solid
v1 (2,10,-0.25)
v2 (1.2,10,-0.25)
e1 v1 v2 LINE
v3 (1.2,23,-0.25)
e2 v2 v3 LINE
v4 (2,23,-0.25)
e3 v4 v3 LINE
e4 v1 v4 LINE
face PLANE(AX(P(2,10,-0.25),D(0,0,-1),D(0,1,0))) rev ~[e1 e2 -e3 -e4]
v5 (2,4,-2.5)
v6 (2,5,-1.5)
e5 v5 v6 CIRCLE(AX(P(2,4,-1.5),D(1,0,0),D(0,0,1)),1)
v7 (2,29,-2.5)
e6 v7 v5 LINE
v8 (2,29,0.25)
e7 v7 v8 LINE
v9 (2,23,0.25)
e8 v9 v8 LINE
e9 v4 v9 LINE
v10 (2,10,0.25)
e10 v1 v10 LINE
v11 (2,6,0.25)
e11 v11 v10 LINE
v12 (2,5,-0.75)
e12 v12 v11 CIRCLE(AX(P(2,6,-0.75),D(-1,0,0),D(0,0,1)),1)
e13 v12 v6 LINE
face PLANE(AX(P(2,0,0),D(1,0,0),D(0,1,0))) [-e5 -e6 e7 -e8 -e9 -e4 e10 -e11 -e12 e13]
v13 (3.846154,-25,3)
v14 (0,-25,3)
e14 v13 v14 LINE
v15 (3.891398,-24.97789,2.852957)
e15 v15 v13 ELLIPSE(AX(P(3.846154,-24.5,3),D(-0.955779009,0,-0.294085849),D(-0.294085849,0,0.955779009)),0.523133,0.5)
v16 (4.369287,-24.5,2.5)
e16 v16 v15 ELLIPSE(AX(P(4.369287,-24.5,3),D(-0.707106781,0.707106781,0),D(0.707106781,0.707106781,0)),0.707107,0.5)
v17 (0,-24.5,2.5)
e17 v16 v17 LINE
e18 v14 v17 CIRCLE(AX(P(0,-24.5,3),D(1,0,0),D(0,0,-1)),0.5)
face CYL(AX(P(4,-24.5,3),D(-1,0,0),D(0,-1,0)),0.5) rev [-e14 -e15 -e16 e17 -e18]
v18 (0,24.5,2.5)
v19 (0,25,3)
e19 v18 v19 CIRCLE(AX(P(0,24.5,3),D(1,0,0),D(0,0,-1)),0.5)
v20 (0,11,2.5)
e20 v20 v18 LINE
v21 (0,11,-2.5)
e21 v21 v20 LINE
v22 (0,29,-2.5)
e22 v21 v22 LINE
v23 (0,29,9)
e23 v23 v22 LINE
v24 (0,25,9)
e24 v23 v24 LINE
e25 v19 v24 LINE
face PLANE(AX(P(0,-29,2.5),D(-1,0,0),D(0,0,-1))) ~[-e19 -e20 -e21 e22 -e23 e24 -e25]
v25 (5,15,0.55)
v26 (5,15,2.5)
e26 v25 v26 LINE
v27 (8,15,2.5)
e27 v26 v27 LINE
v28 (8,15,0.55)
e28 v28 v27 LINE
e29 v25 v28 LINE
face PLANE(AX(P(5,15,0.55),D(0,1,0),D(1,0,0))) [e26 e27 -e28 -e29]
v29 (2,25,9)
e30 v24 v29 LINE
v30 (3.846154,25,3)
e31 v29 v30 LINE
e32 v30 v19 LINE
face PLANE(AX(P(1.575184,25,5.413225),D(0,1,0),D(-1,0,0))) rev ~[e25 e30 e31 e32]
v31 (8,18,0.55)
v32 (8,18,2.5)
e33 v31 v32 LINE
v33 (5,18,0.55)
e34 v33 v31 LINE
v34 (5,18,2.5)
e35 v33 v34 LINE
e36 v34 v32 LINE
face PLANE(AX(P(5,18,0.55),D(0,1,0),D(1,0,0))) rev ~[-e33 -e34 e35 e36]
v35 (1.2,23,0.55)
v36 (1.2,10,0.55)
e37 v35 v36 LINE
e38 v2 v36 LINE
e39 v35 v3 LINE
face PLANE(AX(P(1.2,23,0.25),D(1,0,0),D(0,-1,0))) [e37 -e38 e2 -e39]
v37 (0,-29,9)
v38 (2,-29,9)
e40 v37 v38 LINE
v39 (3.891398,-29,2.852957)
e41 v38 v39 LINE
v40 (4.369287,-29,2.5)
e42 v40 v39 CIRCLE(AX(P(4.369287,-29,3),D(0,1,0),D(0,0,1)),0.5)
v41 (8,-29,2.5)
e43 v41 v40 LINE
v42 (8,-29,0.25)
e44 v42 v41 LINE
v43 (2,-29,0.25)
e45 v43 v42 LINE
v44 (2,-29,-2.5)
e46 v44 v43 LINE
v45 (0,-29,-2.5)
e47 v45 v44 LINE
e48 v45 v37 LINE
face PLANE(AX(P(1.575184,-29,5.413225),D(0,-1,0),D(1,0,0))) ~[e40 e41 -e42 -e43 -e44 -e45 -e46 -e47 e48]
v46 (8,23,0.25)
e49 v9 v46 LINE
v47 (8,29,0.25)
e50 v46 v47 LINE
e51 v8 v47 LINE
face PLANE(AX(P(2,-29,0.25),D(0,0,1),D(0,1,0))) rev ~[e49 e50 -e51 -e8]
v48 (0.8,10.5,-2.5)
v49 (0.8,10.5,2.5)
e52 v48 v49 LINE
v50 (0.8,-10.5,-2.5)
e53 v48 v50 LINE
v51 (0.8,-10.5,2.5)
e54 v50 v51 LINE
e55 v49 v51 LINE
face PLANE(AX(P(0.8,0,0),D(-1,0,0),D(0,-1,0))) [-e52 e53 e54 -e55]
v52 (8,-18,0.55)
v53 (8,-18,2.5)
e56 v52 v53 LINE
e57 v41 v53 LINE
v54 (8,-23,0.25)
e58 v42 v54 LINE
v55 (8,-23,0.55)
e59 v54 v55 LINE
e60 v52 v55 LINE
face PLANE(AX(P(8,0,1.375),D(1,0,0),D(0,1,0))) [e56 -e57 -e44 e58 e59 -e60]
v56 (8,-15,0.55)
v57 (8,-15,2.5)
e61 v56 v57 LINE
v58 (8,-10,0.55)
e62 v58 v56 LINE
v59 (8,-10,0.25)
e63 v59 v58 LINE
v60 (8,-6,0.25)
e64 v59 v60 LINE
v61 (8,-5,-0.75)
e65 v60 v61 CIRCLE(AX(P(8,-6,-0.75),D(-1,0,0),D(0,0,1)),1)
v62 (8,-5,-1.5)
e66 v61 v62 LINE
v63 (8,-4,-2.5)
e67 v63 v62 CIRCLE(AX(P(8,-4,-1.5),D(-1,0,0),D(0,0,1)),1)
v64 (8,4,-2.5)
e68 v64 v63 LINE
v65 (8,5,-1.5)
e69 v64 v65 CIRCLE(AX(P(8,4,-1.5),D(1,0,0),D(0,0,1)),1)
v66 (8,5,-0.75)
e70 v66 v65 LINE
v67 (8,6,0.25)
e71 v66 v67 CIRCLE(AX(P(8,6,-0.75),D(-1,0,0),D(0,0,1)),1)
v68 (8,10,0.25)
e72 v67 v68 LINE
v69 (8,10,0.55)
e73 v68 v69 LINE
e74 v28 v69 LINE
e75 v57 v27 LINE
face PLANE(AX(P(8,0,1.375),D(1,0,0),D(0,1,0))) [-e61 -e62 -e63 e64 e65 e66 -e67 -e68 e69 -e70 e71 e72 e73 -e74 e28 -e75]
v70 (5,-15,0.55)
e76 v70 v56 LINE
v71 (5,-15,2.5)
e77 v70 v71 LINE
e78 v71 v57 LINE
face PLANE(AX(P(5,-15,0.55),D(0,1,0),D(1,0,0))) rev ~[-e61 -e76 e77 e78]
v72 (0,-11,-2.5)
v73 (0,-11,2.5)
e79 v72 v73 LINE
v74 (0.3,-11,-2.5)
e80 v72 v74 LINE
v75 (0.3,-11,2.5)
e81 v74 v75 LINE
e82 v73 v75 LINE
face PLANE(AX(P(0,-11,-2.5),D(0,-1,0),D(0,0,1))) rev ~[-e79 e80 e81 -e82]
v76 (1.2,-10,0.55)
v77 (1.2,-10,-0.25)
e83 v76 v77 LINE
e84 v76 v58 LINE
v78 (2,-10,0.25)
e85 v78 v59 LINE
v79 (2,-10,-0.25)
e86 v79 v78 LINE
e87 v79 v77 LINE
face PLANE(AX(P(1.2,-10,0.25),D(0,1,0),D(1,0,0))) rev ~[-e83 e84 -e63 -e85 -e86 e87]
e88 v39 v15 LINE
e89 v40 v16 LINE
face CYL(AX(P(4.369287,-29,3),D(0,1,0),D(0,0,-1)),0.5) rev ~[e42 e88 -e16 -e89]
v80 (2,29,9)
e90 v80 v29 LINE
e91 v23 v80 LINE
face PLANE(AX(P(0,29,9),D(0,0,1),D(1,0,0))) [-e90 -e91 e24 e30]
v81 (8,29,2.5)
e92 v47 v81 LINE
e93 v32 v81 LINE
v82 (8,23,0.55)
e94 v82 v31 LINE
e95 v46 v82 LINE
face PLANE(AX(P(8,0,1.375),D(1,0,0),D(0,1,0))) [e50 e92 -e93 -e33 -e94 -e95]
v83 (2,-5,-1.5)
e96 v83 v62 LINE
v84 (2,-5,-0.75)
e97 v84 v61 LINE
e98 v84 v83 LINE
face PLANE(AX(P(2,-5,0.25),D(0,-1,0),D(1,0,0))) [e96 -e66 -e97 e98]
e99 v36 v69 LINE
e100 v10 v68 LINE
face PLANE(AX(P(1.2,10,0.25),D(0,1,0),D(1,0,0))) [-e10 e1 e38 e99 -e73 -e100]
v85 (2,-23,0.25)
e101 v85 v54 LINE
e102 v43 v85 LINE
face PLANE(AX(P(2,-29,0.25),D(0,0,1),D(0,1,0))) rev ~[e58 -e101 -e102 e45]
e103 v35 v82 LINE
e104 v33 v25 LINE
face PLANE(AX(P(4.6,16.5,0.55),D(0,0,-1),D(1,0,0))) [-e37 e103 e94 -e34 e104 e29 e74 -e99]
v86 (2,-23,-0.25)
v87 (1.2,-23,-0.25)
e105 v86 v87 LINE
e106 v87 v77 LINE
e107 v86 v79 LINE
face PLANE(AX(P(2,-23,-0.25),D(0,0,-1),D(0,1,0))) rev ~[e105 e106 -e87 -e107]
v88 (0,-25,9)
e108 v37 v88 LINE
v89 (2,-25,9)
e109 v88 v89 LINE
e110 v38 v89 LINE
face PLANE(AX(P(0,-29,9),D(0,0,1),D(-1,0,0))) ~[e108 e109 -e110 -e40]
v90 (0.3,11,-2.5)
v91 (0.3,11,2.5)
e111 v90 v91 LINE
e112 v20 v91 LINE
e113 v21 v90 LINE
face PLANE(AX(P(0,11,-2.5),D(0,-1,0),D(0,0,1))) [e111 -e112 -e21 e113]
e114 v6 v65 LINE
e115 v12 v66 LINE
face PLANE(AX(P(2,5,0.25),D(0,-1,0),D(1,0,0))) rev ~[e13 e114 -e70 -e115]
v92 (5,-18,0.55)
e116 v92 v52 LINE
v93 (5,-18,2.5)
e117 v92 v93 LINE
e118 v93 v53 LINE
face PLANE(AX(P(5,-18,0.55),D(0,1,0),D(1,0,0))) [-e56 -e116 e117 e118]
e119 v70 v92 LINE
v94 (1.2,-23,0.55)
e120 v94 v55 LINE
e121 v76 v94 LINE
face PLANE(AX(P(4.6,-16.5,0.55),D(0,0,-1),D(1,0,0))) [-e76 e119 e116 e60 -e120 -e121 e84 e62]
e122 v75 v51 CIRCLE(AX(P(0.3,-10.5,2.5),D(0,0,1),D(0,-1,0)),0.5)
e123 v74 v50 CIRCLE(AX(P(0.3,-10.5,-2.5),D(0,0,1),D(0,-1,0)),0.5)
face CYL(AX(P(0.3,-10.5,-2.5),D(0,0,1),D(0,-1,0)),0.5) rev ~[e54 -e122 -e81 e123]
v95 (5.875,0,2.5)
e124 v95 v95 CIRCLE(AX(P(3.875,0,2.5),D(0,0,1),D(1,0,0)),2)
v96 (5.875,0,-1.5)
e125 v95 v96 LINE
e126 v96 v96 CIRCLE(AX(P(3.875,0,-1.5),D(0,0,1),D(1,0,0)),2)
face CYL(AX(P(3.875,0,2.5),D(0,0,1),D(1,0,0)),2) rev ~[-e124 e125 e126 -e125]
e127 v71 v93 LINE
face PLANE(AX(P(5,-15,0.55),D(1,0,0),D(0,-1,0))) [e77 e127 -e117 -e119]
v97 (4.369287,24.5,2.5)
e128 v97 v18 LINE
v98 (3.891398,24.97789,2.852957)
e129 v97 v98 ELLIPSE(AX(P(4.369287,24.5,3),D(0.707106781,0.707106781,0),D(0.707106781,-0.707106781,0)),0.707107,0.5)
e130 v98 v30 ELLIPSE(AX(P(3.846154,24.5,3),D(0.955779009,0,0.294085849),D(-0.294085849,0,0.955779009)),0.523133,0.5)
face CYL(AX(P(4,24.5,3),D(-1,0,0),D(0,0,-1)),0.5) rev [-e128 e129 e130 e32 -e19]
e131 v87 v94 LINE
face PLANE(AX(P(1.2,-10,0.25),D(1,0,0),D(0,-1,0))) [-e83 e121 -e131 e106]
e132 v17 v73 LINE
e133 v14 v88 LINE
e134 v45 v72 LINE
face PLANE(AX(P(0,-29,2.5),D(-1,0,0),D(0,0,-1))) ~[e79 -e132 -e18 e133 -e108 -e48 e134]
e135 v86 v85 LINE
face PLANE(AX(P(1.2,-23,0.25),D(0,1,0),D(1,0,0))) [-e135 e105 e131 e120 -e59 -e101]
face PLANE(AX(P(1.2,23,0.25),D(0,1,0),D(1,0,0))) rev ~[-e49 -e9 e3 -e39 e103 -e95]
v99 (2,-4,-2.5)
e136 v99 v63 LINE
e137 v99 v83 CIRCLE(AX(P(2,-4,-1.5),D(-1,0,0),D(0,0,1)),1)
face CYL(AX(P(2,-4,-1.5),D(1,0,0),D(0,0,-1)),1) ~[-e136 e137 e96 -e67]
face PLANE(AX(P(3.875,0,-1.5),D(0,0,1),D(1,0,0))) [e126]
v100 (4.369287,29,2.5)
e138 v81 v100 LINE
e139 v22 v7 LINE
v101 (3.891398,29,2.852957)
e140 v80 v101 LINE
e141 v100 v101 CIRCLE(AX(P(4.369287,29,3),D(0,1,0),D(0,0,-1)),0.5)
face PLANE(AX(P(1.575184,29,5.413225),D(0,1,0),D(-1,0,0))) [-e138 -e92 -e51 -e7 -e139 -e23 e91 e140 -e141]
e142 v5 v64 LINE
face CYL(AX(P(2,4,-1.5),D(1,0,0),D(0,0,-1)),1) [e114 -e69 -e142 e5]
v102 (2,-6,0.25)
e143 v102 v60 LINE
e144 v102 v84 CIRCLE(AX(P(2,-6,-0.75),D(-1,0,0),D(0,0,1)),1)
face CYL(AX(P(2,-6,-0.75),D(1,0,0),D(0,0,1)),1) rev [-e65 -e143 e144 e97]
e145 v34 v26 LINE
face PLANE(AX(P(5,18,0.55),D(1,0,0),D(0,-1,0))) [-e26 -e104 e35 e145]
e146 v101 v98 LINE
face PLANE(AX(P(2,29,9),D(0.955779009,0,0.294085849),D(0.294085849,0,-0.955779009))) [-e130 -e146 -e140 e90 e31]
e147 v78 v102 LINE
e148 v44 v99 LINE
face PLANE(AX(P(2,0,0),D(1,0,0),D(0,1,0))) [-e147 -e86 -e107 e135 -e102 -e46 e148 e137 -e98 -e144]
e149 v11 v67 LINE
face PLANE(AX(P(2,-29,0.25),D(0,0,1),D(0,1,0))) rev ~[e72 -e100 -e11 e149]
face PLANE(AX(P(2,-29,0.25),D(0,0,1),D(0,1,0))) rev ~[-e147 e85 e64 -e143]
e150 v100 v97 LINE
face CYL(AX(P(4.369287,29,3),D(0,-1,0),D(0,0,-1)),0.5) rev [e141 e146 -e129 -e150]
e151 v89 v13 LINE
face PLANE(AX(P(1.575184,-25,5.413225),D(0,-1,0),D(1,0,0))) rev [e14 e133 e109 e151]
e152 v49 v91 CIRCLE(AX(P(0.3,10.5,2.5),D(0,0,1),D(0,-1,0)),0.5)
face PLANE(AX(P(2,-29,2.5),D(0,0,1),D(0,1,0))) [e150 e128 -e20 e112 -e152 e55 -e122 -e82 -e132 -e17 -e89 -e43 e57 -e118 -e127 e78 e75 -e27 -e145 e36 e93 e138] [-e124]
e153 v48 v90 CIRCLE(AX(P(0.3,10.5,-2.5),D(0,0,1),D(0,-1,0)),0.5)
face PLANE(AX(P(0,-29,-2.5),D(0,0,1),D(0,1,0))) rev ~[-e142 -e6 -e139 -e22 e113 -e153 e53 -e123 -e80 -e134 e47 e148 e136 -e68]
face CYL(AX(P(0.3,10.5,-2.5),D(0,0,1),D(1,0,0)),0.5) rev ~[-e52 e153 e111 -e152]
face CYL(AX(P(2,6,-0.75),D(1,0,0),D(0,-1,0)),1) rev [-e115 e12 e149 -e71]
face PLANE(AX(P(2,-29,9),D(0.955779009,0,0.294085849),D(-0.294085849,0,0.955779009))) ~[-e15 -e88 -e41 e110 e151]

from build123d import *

# Parameters (mm, degrees)
F0_W      = 58
F0_H      = 5
F1_DEPTH  = 2
F2_W      = 13
F2_H      = 0.5
F3_DEPTH  = 0.8
F4_W      = 58
F4_H      = 2.25
F5_DEPTH  = 6
F6_W      = 6
F6_H      = 10
F7_DEPTH  = 2.75
F8_R      = 2
F9_DEPTH  = 4
F10_R     = 1
F12_DEPTH = 4
F13_W     = 22
F13_H     = 5
F14_DEPTH = 0.8
F15_R     = 0.5
F16_W     = 6.8
F16_H     = 13
F17_DEPTH = 0.3
F18_W     = 3
F18_H     = 3
F19_DEPTH = 1.95


# Not quite as in the source:
# - a pattern or mirror of a feature is missing from the dataset's text; its kind, count and spacing are read off the source's solid


with BuildPart() as f1:
    # F0 (on Right) → F1 (new body)
    with BuildSketch(Plane.YZ):
        Rectangle(F0_W, F0_H)
    extrude(amount=F1_DEPTH)

    # F2 (on face) → F3 (cut)
    with BuildSketch(Plane.YZ.offset(2)):
        with Locations((16.5, 0)):
            Rectangle(F2_W, F2_H)
        with Locations((-16.5, 0)):
            Rectangle(F2_W, F2_H)
    extrude(amount=-F3_DEPTH, mode=Mode.SUBTRACT)

    # F4 (on face) → F5 (join)
    with BuildSketch(Plane.YZ.offset(2)):
        with Locations((0, 1.375)):
            Rectangle(F4_W, F4_H)
    extrude(amount=F5_DEPTH)

    # F6 (on face) → F7 (join, through all)
    with BuildSketch(Plane(origin=(0, 0, 0.25), x_dir=(1, 0, 0), z_dir=(0, 0, -1))):
        with Locations((5, 0)):
            Rectangle(F6_W, F6_H)
    extrude(amount=F7_DEPTH)

    # F8 (on face) → F9 (cut)
    with BuildSketch(Plane.XY.offset(2.5)):
        with Locations((3.875, 0)):
            Circle(F8_R)
    extrude(amount=-F9_DEPTH, mode=Mode.SUBTRACT)

    # F10
    f10_edges = [f1.edges().sort_by_distance(p)[0] for p in [
        (5, -5, -2.5),
        (5, -5, 0.25),
        (5, 5, 0.25),
        (5, 5, -2.5),
    ]]
    fillet(f10_edges, radius=F10_R)

    # F11 (on face) → F12 (join)
    with BuildSketch(Plane(origin=(0, 29, 0), x_dir=(-1, 0, 0), z_dir=(0, 1, 0))):
        Polygon((-4, 2.5), (0, 2.5), (0, 9), (-2, 9), align=None)
    f12 = extrude(amount=-F12_DEPTH)

    # F12_copies: F12 across plane
    add(f12.mirror(Plane(origin=(0, 0, 0), x_dir=(0, 0, -1), z_dir=(0, -1, 0))))

    # F13 (on face) → F14 (cut)
    with BuildSketch(Plane(origin=(0, 0, 0), x_dir=(0, -1, 0), z_dir=(-1, 0, 0))):
        Rectangle(F13_W, F13_H)
    extrude(amount=-F14_DEPTH, mode=Mode.SUBTRACT)

    # F15
    f15_edges = [f1.edges().sort_by_distance(p)[0] for p in [
        (0.8, 11, 0),
        (0.8, -11, 0),
        (4, 27, 2.5),
        (2, 25, 2.5),
        (2, -25, 2.5),
        (4, -27, 2.5),
    ]]
    fillet(f15_edges, radius=F15_R)

    # F16 (on face) → F17 (cut)
    with BuildSketch(Plane(origin=(0, 0, 0.25), x_dir=(1, 0, 0), z_dir=(0, 0, -1))):
        with Locations((4.6, 16.5)):
            Rectangle(F16_W, F16_H)
        with Locations((4.6, -16.5)):
            Rectangle(F16_W, F16_H)
    extrude(amount=-F17_DEPTH, mode=Mode.SUBTRACT)

    # F18 (on face) → F19 (cut, through all)
    with BuildSketch(Plane(origin=(0, 0, 0.55), x_dir=(1, 0, 0), z_dir=(0, 0, -1))):
        with Locations((6.5, -16.5)):
            Rectangle(F18_W, F18_H)
        with Locations((6.5, 16.5)):
            Rectangle(F18_W, F18_H)
    extrude(amount=-F19_DEPTH, mode=Mode.SUBTRACT)


solid = f1.part
